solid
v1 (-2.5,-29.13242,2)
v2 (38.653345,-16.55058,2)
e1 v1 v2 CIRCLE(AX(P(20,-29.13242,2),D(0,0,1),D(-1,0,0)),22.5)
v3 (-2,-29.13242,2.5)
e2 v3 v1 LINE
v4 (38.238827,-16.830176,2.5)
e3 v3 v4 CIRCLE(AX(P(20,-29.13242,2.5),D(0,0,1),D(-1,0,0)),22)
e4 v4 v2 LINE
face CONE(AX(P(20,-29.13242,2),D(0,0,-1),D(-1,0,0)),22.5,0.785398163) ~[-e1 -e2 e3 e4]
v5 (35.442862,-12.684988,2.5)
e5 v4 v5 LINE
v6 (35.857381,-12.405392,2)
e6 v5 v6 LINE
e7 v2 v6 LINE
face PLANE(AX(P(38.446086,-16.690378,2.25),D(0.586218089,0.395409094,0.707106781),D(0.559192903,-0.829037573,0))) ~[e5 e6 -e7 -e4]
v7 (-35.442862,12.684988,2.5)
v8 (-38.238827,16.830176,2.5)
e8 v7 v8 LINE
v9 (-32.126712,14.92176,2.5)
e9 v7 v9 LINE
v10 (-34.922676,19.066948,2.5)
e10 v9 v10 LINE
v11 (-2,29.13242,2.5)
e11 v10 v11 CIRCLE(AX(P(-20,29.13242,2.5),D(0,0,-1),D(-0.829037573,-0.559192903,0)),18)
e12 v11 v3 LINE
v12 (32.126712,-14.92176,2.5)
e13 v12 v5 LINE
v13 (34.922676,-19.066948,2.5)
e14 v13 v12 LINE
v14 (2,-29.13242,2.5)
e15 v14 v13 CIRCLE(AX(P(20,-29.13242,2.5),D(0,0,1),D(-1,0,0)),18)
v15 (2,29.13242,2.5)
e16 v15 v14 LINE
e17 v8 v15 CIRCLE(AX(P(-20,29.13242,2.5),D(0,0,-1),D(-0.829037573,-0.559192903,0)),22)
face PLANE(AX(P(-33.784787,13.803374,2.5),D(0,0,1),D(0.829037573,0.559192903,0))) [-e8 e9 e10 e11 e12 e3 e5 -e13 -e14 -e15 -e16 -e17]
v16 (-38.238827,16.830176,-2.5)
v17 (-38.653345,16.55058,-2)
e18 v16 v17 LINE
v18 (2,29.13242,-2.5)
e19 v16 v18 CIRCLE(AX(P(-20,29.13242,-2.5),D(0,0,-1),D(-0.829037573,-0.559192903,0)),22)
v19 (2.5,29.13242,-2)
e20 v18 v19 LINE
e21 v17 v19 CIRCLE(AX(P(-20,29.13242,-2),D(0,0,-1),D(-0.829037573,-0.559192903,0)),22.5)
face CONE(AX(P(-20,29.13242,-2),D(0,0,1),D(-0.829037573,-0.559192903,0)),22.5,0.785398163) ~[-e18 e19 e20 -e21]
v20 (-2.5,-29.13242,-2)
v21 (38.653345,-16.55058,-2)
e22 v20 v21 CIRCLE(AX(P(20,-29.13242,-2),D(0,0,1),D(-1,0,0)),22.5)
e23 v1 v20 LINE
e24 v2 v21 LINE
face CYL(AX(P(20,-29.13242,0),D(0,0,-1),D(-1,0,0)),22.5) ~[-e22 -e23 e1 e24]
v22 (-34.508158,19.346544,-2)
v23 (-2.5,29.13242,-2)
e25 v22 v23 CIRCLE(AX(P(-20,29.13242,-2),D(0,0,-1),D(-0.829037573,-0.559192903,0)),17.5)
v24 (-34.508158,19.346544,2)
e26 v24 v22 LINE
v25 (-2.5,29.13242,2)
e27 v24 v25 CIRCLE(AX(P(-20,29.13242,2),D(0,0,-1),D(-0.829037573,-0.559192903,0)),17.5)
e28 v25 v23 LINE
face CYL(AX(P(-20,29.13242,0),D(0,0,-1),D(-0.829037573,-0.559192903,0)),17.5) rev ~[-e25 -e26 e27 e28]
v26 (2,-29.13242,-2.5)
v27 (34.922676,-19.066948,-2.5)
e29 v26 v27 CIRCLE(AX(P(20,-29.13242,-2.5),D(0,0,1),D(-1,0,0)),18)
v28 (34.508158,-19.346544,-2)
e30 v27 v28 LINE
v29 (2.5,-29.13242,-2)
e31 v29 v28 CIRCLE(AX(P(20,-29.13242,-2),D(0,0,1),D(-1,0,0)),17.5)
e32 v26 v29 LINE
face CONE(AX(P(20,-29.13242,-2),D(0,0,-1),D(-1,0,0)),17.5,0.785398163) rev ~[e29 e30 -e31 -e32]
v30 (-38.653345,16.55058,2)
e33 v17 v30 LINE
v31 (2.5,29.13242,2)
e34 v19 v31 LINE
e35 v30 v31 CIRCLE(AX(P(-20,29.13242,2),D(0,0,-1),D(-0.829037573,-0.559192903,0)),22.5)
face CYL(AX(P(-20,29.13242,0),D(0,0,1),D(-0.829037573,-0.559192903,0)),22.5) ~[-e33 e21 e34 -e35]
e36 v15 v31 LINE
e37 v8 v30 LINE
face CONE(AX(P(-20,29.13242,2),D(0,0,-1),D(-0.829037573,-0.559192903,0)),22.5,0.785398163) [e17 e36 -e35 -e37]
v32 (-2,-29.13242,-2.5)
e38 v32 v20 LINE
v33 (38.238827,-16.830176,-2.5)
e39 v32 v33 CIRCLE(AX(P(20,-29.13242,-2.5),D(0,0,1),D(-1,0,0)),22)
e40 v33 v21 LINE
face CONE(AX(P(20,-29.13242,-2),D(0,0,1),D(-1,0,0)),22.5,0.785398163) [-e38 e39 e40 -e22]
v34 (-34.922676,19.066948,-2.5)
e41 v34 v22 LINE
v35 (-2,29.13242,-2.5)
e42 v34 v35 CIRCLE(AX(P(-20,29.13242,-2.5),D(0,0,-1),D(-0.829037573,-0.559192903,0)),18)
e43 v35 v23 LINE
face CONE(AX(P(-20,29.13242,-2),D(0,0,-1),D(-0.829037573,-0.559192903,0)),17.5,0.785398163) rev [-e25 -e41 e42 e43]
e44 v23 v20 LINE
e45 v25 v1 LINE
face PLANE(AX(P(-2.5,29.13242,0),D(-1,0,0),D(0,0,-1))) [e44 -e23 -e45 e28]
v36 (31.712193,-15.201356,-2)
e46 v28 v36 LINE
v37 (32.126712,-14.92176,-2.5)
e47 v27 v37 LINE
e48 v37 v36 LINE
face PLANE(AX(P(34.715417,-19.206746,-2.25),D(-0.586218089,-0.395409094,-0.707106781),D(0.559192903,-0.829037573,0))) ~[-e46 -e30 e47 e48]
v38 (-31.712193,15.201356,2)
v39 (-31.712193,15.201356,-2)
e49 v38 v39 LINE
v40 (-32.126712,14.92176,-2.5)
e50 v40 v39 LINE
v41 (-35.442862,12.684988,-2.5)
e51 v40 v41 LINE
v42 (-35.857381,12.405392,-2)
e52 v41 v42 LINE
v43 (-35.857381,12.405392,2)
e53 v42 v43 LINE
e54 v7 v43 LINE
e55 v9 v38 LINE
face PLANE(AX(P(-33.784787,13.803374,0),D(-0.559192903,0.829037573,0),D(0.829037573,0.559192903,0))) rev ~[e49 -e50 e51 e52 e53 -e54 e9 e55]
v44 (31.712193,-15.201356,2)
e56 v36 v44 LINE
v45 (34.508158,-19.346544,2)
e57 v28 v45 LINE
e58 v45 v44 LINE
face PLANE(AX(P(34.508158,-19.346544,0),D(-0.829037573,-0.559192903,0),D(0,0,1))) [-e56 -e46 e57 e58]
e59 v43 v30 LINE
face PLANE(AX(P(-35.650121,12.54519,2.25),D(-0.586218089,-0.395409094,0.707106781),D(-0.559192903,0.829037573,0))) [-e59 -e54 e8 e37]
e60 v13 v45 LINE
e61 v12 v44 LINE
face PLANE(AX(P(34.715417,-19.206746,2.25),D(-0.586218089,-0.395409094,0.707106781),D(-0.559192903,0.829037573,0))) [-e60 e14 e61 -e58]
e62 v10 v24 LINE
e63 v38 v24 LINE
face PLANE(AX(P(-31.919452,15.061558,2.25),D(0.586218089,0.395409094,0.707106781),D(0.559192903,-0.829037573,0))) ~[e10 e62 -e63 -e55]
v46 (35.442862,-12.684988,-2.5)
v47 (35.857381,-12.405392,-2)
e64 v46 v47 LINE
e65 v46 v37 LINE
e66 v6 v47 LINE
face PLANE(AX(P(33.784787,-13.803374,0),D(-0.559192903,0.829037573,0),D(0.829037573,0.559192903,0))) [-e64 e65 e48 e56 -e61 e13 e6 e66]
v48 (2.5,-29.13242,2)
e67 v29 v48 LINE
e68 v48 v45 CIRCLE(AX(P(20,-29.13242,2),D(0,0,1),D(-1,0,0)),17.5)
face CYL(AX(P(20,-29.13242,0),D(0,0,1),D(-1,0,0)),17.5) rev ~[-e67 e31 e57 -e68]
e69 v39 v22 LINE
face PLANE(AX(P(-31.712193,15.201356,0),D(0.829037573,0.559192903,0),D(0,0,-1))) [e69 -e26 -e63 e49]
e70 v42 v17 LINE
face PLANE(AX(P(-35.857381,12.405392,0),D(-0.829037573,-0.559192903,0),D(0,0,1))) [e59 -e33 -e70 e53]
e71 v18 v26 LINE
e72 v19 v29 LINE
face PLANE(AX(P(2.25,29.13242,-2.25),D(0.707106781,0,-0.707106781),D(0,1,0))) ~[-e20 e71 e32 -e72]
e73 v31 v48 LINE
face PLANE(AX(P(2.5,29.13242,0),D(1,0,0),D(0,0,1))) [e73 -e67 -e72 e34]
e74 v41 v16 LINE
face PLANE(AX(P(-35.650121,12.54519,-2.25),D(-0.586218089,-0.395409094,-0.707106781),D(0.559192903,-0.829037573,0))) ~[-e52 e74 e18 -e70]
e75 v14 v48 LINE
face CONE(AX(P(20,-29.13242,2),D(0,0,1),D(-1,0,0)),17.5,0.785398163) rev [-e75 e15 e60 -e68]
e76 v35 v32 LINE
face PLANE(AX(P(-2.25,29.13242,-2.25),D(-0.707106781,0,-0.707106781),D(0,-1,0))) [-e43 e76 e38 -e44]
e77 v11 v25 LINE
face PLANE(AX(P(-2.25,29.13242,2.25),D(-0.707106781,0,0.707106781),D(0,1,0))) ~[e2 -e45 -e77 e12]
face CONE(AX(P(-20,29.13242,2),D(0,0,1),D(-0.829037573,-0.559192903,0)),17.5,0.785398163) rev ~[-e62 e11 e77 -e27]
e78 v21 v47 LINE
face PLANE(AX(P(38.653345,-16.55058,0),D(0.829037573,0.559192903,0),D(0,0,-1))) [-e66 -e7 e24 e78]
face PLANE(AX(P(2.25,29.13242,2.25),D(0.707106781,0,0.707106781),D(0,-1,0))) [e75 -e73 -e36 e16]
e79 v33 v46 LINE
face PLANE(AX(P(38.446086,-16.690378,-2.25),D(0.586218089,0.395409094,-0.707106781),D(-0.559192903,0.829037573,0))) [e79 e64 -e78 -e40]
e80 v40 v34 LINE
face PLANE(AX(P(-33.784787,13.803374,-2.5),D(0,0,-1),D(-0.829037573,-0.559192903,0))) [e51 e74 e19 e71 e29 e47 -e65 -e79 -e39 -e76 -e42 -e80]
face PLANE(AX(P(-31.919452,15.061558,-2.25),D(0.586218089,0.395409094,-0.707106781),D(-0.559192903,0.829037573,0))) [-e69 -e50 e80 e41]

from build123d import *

# Parameters (mm, degrees)
F1_W    = 5
F1_H    = 5
F3_SIZE = 0.5


with BuildPart() as f2:
    # F2: sweep along a path in F0
    with BuildLine(Plane.XY) as f2_path:
        Line((-33.7847869337, 13.8033740678), (-36.5807514511, 17.9485619306))
        ThreePointArc((-36.5807514511, 17.9485619306), (-25.8474340945, 48.2585151193), (0, 29.13242))
        Line((0, 29.13242), (0, -29.13242))
        ThreePointArc((0, -29.13242), (25.8474340945, -48.2585151193), (36.5807514511, -17.9485619306))
        Line((36.5807514511, -17.9485619306), (33.7847869337, -13.8033740678))
    # F1 (on Front) → F2 (sweep)
    with BuildSketch(Plane.XZ):
        Rectangle(F1_W, F1_H)
    sweep(path=f2_path.line)

    # F3
    f3_edges = [f2.edges().sort_by_distance(p)[0] for p in [
        (-2.5, 0, -2.5),
        (-26.578363, 50.649277, -2.5),
        (-26.578363, 50.649277, 2.5),
        (-2.5, 0, 2.5),
    ]]
    chamfer(f3_edges, length=F3_SIZE)


solid = f2.part
